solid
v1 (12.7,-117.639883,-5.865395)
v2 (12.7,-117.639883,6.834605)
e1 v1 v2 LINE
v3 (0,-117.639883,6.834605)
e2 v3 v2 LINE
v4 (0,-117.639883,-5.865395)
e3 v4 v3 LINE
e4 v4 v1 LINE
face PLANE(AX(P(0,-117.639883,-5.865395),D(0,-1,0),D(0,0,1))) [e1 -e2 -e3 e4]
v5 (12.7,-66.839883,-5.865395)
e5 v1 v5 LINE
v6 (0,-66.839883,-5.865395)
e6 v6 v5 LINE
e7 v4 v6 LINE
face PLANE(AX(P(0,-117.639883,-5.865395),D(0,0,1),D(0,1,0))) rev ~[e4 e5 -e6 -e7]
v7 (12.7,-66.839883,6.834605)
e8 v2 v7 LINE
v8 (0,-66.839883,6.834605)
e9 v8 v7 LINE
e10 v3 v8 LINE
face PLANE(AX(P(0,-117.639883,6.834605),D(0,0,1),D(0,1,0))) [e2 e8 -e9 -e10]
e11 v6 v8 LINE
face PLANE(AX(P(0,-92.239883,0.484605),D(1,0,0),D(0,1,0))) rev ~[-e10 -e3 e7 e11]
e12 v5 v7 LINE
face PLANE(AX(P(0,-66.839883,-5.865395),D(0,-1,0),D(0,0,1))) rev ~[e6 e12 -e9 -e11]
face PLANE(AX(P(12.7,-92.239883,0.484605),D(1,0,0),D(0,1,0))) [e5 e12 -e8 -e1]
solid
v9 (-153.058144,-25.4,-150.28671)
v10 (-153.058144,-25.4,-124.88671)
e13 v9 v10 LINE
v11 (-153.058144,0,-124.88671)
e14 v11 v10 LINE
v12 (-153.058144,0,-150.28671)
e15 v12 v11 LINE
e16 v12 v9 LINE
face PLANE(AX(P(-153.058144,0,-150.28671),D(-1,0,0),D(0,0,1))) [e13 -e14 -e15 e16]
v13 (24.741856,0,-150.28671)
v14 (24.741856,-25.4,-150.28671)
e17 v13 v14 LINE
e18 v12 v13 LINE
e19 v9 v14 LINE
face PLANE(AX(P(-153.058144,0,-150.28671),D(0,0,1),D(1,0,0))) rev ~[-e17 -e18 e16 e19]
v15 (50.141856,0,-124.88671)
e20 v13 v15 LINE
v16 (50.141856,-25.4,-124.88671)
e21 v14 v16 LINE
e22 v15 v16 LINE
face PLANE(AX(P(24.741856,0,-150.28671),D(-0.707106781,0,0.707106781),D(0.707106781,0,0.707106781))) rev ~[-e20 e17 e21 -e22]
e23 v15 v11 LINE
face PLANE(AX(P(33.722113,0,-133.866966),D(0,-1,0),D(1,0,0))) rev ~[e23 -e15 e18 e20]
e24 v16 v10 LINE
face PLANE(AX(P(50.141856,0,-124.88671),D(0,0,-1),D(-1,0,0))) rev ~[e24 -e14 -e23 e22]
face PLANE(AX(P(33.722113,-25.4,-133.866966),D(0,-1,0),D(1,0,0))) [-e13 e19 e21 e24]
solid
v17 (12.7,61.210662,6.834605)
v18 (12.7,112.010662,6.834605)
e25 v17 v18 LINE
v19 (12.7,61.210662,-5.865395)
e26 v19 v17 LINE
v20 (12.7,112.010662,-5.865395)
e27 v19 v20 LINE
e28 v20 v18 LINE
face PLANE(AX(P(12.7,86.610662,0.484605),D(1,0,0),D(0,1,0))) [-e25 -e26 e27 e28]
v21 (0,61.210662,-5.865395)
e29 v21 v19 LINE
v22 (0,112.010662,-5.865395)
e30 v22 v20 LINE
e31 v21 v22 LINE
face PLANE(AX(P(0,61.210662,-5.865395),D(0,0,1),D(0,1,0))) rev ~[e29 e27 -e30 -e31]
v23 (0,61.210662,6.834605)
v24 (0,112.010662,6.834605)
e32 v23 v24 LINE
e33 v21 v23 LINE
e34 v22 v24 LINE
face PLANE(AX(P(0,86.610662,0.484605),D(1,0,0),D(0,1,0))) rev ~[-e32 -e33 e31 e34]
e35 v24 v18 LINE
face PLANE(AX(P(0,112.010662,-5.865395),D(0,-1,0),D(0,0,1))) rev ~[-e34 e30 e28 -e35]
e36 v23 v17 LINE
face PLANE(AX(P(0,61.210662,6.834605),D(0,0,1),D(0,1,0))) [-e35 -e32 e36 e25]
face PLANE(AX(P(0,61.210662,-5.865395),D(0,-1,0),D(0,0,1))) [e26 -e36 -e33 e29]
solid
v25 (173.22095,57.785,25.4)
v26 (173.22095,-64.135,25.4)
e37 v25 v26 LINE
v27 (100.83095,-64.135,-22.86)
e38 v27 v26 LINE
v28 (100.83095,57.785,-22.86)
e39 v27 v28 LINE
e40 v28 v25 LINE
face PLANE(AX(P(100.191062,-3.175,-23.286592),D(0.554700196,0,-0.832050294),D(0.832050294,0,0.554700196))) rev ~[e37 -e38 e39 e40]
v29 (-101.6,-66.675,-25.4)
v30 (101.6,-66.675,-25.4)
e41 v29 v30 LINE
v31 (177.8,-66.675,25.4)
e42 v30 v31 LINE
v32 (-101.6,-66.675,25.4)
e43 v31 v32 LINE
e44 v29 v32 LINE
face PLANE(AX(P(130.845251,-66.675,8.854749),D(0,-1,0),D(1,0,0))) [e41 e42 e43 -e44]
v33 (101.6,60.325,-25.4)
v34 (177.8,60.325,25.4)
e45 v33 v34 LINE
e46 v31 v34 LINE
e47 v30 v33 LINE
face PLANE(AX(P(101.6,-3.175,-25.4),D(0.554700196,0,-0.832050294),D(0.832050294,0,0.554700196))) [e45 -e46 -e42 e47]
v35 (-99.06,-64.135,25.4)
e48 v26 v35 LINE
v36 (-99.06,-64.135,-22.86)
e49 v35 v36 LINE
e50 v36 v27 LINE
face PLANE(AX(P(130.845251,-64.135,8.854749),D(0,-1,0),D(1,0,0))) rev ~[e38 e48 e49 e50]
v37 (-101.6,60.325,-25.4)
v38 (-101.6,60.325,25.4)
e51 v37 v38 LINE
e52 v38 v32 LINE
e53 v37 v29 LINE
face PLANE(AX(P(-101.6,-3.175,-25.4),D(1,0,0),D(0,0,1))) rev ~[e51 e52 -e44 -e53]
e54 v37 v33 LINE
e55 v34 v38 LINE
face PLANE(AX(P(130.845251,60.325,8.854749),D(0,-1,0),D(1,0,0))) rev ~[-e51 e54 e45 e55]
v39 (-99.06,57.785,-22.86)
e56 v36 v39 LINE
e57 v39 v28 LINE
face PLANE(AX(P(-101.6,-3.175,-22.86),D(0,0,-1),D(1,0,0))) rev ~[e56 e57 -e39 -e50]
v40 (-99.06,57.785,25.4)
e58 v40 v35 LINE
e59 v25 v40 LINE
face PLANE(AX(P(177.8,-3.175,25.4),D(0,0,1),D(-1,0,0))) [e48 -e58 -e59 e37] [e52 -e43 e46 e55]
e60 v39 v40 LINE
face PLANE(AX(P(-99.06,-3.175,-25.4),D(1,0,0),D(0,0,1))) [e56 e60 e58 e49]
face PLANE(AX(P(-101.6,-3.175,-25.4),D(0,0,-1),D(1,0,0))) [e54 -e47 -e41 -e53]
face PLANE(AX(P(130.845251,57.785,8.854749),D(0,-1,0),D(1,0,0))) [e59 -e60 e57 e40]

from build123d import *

# Parameters (mm, degrees)
F0_W     = 203.2
F0_H     = 50.8
F1_DEPTH = 3.175
F4_DEPTH = 63.5
F5_T     = -2.54
F6_W     = 50.8
F6_H     = 12.7
F7_DEPTH = 12.7
F8_W     = 177.8
F8_H     = 25.4
F9_DEPTH = 25.4


with BuildPart() as f1:
    # F0 (on Front) → F1 (new body, symmetric)
    with BuildSketch(Plane.XZ):
        Polygon((177.8, 25.4), (101.6, 25.4), (101.6, -25.4), align=None)
        Rectangle(F0_W, F0_H)
    extrude(amount=F1_DEPTH, both=True)


with BuildPart() as f2_1:
    # F2: copy of F1
    add(f1.part)


with BuildPart() as f1_1:
    add(f1.part)

    # F4 (add, symmetric): a face of the model
    f4_faces = [f1_1.faces().sort_by_distance(p)[0] for p in [
        (20.0526315789, -3.175, 1.3368421053),
    ]]
    extrude(f4_faces, amount=F4_DEPTH, both=True)

    # F5
    f5_openings = [f1_1.faces().sort_by_distance(p)[0] for p in [
        (38.1, -3.175, 25.4),
    ]]
    offset(amount=F5_T, openings=f5_openings)


with BuildPart() as f7:
    # F6 (on Right) → F7 (new body)
    with BuildSketch(Plane.YZ):
        with Locations((-92.2398825281, 0.4846053965)):
            Rectangle(F6_W, F6_H)
    extrude(amount=F7_DEPTH)


with BuildPart() as f7b:
    # F6 (on Right) → F7, piece 2 (new body)
    with BuildSketch(Plane.YZ):
        with Locations((86.6106621265, 0.4846053965)):
            Rectangle(F6_W, F6_H)
    extrude(amount=F7_DEPTH)


with BuildPart() as f9:
    # F8 (on Front) → F9 (new body)
    with BuildSketch(Plane.XZ):
        Polygon((50.1418564967, -124.886709961), (24.7418564967, -124.886709961), (24.7418564967, -150.286709961), align=None)
        with Locations((-64.1581435033, -137.586709961)):
            Rectangle(F8_W, F8_H)
    extrude(amount=F9_DEPTH)


solid = Compound([f1_1.part, f7.part, f7b.part, f9.part])
